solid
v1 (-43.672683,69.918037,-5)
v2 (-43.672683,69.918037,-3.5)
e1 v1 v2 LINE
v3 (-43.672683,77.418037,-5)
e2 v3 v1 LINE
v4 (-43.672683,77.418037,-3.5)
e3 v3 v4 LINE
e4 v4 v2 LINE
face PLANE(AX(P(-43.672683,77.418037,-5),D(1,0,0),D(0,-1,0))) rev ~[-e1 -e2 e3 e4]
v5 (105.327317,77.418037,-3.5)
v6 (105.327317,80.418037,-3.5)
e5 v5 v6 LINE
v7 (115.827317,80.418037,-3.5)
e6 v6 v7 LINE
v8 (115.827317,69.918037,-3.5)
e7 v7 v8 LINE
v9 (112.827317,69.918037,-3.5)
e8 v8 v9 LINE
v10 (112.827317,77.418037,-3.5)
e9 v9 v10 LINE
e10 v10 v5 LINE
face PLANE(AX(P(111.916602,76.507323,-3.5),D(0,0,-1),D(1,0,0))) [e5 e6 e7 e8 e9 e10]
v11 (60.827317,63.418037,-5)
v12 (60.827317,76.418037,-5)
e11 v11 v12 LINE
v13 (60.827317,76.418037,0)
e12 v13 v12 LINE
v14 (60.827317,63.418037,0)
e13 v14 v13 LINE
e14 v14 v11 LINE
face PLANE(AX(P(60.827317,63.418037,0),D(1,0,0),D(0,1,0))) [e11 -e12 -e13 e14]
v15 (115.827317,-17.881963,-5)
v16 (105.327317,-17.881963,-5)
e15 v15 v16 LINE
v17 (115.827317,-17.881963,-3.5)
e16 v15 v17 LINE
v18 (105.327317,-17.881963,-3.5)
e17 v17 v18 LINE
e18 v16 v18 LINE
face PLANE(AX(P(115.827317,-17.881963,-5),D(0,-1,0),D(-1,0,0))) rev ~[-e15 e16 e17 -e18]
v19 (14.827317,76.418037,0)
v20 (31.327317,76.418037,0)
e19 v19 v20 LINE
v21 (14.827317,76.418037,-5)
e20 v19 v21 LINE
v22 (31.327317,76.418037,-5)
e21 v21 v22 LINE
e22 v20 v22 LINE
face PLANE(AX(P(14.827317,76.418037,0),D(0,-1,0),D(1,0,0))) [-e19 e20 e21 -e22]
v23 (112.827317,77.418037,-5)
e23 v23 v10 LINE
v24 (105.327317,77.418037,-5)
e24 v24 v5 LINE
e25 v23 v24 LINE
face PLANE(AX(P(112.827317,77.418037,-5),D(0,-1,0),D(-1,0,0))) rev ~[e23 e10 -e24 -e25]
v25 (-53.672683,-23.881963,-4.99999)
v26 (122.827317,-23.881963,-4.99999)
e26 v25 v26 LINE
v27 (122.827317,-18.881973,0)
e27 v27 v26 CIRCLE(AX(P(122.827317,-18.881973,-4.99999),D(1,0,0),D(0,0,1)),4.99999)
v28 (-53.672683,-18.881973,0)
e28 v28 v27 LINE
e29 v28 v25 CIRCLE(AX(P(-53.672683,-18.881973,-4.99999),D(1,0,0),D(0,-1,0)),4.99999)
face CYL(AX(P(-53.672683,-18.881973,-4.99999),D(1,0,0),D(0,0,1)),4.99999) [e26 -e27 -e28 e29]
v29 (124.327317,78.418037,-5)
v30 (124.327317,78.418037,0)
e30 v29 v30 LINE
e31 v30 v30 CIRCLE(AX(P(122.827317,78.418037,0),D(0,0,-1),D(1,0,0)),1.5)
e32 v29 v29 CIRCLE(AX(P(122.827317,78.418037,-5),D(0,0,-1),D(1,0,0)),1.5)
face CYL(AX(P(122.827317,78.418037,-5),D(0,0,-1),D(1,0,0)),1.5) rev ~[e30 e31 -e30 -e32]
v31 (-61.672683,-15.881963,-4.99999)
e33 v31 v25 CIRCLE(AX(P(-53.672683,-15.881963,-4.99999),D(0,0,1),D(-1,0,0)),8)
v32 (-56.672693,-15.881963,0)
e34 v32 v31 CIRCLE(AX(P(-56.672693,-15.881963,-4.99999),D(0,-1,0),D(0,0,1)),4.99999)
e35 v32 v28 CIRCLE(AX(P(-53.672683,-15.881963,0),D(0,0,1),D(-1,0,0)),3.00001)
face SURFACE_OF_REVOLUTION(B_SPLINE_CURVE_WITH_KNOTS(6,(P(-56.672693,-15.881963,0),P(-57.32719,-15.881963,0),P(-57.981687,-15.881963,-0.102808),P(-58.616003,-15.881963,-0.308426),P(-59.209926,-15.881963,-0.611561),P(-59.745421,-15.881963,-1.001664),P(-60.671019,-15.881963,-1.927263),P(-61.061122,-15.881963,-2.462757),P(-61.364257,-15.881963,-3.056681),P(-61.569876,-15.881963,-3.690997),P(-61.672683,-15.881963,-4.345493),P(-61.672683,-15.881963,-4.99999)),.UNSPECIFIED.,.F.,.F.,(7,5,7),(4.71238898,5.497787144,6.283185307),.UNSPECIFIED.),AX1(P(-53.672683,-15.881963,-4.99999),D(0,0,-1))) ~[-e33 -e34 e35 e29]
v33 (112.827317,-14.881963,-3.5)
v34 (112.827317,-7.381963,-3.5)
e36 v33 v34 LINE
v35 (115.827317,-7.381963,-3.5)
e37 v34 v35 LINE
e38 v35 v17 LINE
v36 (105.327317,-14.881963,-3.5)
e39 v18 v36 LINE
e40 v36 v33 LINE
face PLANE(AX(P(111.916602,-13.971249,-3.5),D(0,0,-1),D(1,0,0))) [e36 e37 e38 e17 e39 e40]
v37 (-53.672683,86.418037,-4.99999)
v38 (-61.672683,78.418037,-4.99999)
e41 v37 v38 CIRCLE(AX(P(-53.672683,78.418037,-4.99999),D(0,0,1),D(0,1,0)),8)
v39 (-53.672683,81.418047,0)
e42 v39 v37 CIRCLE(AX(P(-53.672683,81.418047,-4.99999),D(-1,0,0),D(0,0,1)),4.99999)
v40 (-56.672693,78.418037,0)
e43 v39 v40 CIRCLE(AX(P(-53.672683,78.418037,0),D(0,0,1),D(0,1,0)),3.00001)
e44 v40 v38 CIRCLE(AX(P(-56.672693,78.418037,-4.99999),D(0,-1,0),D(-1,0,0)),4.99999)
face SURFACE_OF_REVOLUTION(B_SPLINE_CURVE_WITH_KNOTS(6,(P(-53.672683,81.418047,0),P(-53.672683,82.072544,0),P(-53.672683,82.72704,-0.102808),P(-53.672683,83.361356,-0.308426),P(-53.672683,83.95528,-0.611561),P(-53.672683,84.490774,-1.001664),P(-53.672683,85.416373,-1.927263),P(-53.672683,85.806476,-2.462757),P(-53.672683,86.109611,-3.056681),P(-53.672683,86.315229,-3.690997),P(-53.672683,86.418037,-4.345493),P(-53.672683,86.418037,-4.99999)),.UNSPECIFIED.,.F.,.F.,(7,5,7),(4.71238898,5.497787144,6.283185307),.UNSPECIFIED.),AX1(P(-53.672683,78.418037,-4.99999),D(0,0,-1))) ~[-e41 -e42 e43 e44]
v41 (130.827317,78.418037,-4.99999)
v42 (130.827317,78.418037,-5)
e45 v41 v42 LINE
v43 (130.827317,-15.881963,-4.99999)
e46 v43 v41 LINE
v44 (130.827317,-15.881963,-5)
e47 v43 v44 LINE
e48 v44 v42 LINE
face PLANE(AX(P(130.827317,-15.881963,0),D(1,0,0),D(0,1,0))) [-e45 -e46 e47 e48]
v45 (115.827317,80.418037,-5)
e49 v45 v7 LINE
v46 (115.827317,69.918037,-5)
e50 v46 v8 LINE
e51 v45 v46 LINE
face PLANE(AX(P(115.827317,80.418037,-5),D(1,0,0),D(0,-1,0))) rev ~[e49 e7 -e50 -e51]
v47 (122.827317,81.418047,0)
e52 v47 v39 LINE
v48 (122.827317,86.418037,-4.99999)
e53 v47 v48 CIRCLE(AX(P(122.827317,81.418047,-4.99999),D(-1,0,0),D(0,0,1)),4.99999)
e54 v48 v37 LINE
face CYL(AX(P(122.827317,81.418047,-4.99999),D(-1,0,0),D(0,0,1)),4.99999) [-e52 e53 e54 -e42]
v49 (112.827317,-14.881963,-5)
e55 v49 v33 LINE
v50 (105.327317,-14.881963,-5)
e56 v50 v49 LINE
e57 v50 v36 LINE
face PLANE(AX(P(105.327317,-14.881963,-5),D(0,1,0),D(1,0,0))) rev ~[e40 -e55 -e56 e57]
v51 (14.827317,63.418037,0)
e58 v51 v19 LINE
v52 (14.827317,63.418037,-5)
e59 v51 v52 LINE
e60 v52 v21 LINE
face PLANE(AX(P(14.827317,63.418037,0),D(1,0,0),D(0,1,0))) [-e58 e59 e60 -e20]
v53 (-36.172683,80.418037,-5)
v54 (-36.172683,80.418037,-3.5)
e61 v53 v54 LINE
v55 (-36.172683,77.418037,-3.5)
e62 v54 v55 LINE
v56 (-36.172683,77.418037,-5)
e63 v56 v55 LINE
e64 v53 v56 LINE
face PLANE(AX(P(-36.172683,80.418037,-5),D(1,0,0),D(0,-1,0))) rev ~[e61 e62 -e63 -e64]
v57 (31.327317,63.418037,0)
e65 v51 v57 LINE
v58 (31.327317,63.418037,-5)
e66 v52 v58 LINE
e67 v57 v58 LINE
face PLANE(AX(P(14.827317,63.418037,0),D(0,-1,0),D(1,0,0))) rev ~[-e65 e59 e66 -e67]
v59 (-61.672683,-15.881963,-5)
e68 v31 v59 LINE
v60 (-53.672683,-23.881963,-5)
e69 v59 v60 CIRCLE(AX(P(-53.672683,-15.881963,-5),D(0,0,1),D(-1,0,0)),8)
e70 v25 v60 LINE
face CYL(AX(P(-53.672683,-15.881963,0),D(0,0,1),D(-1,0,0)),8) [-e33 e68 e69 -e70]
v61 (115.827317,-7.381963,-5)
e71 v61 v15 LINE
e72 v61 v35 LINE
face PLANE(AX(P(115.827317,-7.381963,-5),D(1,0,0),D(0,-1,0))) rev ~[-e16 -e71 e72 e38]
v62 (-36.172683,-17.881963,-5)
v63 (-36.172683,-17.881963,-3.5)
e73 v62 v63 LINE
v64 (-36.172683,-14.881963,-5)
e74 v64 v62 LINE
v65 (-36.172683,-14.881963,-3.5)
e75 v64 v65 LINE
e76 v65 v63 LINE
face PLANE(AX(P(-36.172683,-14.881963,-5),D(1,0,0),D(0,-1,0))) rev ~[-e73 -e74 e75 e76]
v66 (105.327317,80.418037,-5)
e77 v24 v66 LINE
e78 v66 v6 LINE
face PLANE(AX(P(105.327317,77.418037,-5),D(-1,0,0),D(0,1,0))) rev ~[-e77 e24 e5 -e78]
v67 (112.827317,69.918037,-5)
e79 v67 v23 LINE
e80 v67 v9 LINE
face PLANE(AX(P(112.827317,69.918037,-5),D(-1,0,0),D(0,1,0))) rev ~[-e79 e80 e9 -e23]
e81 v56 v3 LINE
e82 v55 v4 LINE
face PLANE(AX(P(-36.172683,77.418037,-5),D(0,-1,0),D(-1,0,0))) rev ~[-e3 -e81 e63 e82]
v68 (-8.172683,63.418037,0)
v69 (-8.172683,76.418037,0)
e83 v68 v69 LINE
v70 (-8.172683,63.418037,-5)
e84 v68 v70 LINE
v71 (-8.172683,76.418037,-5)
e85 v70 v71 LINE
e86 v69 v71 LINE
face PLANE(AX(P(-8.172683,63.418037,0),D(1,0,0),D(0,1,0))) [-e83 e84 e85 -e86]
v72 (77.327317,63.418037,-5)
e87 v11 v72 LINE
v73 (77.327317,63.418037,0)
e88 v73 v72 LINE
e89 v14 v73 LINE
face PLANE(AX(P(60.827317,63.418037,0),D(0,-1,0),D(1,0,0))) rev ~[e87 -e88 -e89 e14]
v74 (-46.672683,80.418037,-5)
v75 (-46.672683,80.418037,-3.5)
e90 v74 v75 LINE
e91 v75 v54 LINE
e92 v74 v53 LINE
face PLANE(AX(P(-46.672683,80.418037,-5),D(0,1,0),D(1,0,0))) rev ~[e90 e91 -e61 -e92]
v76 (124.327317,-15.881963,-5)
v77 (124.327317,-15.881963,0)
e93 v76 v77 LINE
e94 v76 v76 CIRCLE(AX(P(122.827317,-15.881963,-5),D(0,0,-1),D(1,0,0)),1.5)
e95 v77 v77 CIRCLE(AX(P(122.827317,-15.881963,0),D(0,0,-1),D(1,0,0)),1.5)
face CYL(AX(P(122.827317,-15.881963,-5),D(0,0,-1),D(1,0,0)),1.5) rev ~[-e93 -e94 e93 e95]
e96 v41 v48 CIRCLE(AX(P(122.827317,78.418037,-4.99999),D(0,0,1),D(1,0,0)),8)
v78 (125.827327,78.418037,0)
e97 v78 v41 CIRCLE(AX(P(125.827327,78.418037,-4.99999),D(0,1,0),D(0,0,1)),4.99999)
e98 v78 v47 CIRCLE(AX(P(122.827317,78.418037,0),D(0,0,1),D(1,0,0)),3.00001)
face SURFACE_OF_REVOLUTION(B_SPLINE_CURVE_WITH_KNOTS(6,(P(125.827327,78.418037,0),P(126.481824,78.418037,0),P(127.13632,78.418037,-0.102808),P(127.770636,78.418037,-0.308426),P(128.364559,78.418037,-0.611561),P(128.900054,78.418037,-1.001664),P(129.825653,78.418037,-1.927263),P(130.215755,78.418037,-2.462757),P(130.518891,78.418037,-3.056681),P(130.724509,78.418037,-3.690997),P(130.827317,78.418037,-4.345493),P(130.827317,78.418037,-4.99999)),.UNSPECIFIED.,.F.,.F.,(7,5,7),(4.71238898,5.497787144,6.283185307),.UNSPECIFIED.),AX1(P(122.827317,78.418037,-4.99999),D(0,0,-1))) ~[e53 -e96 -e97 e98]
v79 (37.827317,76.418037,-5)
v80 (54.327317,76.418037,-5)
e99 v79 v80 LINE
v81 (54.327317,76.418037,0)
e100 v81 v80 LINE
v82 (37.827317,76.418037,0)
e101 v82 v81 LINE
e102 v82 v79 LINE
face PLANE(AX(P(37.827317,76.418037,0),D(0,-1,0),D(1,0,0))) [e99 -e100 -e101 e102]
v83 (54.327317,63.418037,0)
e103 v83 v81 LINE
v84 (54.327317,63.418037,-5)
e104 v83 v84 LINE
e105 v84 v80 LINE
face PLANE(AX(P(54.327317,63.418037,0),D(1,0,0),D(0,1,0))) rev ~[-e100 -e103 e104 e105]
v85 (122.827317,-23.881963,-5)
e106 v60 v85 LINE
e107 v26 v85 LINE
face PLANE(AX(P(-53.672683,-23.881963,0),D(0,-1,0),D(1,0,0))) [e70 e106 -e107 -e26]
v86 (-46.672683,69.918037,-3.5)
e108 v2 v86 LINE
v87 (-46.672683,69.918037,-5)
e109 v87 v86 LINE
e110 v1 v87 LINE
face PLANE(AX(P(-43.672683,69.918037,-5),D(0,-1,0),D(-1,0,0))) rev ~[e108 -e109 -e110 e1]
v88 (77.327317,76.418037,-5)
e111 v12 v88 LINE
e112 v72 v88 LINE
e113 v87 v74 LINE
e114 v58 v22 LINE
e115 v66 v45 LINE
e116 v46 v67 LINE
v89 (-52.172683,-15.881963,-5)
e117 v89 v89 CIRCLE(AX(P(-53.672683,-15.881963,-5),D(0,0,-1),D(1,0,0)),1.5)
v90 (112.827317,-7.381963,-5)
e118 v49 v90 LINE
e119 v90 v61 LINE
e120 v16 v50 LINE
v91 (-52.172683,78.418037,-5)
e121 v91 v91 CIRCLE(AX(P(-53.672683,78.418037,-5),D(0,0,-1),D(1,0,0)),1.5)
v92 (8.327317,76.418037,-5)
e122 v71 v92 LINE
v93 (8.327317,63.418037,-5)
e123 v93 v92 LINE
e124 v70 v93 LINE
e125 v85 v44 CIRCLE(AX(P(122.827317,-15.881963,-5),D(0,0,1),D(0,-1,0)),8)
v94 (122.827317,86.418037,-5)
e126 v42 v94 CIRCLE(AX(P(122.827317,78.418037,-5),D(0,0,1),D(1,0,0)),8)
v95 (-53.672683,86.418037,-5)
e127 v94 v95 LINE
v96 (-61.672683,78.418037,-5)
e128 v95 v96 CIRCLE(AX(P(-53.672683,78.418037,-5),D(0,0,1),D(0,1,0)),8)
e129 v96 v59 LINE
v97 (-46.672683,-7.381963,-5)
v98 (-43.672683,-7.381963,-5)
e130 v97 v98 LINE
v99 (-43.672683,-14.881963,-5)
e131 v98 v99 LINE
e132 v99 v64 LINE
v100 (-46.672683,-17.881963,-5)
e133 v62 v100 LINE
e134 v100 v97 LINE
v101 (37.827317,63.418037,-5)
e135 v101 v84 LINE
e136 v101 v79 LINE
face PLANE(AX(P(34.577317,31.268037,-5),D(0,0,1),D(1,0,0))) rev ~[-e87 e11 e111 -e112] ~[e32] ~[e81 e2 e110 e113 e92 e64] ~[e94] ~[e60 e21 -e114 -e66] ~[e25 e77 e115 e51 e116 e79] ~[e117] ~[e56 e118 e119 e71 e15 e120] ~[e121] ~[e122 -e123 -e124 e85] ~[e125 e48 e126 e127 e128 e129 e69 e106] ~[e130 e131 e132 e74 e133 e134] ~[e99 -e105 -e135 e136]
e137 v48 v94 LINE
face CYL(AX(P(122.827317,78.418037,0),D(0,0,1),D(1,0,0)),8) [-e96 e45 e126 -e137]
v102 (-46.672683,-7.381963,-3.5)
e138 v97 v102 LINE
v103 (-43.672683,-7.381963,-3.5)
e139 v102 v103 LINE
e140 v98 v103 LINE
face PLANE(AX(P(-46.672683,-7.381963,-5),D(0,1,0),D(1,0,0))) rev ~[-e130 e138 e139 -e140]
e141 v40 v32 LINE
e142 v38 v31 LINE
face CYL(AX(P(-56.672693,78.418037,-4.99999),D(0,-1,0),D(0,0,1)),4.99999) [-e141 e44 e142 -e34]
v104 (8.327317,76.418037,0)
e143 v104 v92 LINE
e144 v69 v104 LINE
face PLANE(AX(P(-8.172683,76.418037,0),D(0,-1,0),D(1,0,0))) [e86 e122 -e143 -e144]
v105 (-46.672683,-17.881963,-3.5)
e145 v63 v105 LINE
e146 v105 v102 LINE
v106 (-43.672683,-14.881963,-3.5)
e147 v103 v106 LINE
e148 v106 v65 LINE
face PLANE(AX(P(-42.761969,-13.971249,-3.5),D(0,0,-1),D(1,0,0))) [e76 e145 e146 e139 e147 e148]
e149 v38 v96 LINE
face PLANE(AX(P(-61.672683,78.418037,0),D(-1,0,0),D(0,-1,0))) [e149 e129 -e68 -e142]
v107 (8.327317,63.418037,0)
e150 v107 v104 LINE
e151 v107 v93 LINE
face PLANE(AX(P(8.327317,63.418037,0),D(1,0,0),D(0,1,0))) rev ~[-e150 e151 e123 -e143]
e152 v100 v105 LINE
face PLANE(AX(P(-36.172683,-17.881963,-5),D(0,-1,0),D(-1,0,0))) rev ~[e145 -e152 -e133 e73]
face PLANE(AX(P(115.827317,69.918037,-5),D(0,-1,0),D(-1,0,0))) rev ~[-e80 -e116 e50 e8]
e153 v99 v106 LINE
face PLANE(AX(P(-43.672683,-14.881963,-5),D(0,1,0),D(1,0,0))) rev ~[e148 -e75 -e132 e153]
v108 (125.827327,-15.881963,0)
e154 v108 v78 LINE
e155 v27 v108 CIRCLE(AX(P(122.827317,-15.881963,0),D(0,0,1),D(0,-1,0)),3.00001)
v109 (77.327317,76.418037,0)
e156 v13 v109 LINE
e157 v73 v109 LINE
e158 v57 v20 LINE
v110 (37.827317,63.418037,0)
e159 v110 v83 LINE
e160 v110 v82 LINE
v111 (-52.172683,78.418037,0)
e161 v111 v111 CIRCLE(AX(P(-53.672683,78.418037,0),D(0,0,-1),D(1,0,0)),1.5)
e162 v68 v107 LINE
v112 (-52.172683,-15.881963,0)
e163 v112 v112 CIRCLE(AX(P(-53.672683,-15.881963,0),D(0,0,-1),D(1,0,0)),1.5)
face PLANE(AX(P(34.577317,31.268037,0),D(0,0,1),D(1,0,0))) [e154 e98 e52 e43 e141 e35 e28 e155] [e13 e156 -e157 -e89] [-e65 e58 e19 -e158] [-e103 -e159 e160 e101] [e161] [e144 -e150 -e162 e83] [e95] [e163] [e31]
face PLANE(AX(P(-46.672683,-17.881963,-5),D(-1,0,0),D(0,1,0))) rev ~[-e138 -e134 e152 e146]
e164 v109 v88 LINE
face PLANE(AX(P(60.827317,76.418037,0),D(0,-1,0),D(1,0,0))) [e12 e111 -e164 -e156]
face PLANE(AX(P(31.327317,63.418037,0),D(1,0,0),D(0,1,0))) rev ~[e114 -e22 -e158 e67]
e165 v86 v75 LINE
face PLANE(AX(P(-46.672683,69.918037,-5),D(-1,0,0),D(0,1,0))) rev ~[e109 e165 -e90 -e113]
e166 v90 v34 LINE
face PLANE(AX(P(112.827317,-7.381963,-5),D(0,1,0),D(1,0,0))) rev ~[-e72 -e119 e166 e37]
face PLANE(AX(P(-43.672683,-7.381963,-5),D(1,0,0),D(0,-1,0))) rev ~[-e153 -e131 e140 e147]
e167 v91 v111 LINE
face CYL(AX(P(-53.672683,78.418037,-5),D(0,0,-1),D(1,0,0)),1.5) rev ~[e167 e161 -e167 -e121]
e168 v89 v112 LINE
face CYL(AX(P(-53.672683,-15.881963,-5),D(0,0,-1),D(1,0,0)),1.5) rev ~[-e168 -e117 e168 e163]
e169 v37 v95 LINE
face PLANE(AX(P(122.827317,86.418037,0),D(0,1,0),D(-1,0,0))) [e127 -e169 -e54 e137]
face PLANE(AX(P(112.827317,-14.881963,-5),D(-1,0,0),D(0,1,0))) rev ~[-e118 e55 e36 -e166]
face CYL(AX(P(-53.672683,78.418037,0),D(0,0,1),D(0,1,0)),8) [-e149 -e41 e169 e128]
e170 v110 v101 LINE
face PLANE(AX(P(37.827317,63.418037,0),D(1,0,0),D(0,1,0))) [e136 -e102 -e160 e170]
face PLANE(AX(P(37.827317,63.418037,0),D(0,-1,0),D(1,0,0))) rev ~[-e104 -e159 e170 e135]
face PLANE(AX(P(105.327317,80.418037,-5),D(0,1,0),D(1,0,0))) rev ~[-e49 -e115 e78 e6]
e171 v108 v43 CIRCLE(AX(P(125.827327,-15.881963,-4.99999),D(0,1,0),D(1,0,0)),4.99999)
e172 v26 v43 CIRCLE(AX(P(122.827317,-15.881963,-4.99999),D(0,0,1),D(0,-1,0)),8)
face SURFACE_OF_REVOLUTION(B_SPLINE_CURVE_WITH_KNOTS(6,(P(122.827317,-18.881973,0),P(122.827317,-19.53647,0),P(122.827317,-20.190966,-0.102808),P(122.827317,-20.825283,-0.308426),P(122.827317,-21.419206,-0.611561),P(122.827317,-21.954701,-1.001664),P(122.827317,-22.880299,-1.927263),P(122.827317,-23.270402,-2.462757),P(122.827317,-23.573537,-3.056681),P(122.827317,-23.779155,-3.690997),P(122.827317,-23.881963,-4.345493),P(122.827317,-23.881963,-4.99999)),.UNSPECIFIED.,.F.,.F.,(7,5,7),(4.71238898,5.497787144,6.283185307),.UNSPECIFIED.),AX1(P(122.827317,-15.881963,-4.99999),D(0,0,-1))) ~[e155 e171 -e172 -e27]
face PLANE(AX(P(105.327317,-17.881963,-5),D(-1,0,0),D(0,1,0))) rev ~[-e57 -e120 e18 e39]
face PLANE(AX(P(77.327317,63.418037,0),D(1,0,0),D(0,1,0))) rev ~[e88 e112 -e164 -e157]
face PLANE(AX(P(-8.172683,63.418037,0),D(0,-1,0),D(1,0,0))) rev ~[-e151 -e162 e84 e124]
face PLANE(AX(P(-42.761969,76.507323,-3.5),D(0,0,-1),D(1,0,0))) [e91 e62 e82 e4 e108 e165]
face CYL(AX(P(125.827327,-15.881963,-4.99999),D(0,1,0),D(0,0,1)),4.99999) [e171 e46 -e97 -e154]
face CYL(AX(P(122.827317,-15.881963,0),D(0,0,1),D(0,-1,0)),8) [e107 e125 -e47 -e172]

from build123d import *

# Parameters (mm, degrees)
F1_DEPTH = 5
F2_R     = 1.5
F3_DEPTH = 5.001
F4_DEPTH = 25
F5_R     = 4.99999
F6_W     = 16.5
F6_H     = 13
F7_DEPTH = 5.001
F9_DEPTH = 1.5


# Not quite as in the source:
# - a fillet or chamfer is up to 0.001 mm smaller than in the source, because OpenCascade refuses the exact size


with BuildPart() as f1:
    # F0 (on Top) → F1 (new body)
    with BuildSketch(Plane.XY):
        with BuildLine():
            ThreePointArc((-61.6726832837, -15.8819631437), (-59.3295375332, -21.5388173932), (-53.6726832837, -23.8819631437))
            Line((-53.6726832837, -23.8819631437), (122.8273167163, -23.8819631437))
            ThreePointArc((122.8273167163, -23.8819631437), (128.4841709658, -21.5388173932), (130.8273167163, -15.8819631437))
            Line((130.8273167163, -15.8819631437), (130.8273167163, 78.4180368563))
            ThreePointArc((130.8273167163, 78.4180368563), (128.4841709658, 84.0748911058), (122.8273167163, 86.4180368563))
            Line((122.8273167163, 86.4180368563), (-53.6726832837, 86.4180368563))
            ThreePointArc((-53.6726832837, 86.4180368563), (-59.3295375332, 84.0748911058), (-61.6726832837, 78.4180368563))
            Line((-61.6726832837, 78.4180368563), (-61.6726832837, -15.8819631437))
        make_face()
    extrude(amount=-F1_DEPTH)

    # F2 (on face) → F3 (cut, through all)
    with BuildSketch(Plane(origin=(0, 0, -5), x_dir=(1, 0, 0), z_dir=(0, 0, -1))):
        with Locations((-53.6726832837, 15.8819631437)):
            Circle(F2_R)
        with Locations((122.8273167163, 15.8819631437)):
            Circle(F2_R)
        with Locations((122.8273167163, -78.4180368563)):
            Circle(F2_R)
        with Locations((-53.6726832837, -78.4180368563)):
            Circle(F2_R)
    extrude(amount=-F3_DEPTH, mode=Mode.SUBTRACT)

    # F4 (cut): a face of the model
    f4_faces = [f1.faces().sort_by_distance(p)[0] for p in [
        (34.5773167163, 31.2680368563, -5),
    ]]
    extrude(f4_faces, amount=F4_DEPTH, mode=Mode.SUBTRACT)

    # F5 (radius 5 in the source; OpenCascade refuses exactly that, so slightly less here)
    f5_edges = [f1.edges().sort_by_distance(p)[0] for p in [
        (34.577317, 86.418037, 0),
        (128.484171, 84.074891, 0),
        (130.827317, 31.268037, 0),
        (128.484171, -21.538817, 0),
        (34.577317, -23.881963, 0),
        (-59.329538, -21.538817, 0),
        (-61.672683, 31.268037, 0),
        (-59.329538, 84.074891, 0),
    ]]
    fillet(f5_edges, radius=F5_R)

    # F6 (on face) → F7 (cut, through all)
    with BuildSketch(Plane.XY):
        with Locations((0.0773167163, 69.9180368563)):
            Rectangle(F6_W, F6_H)
        with Locations((23.0773167163, 69.9180368563)):
            Rectangle(F6_W, F6_H)
        with Locations((46.0773167163, 69.9180368563)):
            Rectangle(F6_W, F6_H)
        with Locations((69.0773167163, 69.9180368563)):
            Rectangle(F6_W, F6_H)
    extrude(amount=-F7_DEPTH, mode=Mode.SUBTRACT)

    # F8 (on face) → F9 (cut)
    with BuildSketch(Plane(origin=(0, 0, -5), x_dir=(1, 0, 0), z_dir=(0, 0, -1))):
        Polygon((-43.6726832837, -69.9180368563), (-46.6726832837, -69.9180368563), (-46.6726832837, -80.4180368563), (-36.1726832837, -80.4180368563), (-36.1726832837, -77.4180368563), (-43.6726832837, -77.4180368563), align=None)
        Polygon((-46.6726832837, 7.3819631437), (-43.6726832837, 7.3819631437), (-43.6726832837, 14.8819631437), (-36.1726832837, 14.8819631437), (-36.1726832837, 17.8819631437), (-46.6726832837, 17.8819631437), align=None)
        Polygon((115.8273167163, 17.8819631437), (105.3273167163, 17.8819631437), (105.3273167163, 14.8819631437), (112.8273167163, 14.8819631437), (112.8273167163, 7.3819631437), (115.8273167163, 7.3819631437), align=None)
        Polygon((115.8273167163, -69.9180368563), (112.8273167163, -69.9180368563), (112.8273167163, -77.4180368563), (105.3273167163, -77.4180368563), (105.3273167163, -80.4180368563), (115.8273167163, -80.4180368563), align=None)
    extrude(amount=-F9_DEPTH, mode=Mode.SUBTRACT)


solid = f1.part
